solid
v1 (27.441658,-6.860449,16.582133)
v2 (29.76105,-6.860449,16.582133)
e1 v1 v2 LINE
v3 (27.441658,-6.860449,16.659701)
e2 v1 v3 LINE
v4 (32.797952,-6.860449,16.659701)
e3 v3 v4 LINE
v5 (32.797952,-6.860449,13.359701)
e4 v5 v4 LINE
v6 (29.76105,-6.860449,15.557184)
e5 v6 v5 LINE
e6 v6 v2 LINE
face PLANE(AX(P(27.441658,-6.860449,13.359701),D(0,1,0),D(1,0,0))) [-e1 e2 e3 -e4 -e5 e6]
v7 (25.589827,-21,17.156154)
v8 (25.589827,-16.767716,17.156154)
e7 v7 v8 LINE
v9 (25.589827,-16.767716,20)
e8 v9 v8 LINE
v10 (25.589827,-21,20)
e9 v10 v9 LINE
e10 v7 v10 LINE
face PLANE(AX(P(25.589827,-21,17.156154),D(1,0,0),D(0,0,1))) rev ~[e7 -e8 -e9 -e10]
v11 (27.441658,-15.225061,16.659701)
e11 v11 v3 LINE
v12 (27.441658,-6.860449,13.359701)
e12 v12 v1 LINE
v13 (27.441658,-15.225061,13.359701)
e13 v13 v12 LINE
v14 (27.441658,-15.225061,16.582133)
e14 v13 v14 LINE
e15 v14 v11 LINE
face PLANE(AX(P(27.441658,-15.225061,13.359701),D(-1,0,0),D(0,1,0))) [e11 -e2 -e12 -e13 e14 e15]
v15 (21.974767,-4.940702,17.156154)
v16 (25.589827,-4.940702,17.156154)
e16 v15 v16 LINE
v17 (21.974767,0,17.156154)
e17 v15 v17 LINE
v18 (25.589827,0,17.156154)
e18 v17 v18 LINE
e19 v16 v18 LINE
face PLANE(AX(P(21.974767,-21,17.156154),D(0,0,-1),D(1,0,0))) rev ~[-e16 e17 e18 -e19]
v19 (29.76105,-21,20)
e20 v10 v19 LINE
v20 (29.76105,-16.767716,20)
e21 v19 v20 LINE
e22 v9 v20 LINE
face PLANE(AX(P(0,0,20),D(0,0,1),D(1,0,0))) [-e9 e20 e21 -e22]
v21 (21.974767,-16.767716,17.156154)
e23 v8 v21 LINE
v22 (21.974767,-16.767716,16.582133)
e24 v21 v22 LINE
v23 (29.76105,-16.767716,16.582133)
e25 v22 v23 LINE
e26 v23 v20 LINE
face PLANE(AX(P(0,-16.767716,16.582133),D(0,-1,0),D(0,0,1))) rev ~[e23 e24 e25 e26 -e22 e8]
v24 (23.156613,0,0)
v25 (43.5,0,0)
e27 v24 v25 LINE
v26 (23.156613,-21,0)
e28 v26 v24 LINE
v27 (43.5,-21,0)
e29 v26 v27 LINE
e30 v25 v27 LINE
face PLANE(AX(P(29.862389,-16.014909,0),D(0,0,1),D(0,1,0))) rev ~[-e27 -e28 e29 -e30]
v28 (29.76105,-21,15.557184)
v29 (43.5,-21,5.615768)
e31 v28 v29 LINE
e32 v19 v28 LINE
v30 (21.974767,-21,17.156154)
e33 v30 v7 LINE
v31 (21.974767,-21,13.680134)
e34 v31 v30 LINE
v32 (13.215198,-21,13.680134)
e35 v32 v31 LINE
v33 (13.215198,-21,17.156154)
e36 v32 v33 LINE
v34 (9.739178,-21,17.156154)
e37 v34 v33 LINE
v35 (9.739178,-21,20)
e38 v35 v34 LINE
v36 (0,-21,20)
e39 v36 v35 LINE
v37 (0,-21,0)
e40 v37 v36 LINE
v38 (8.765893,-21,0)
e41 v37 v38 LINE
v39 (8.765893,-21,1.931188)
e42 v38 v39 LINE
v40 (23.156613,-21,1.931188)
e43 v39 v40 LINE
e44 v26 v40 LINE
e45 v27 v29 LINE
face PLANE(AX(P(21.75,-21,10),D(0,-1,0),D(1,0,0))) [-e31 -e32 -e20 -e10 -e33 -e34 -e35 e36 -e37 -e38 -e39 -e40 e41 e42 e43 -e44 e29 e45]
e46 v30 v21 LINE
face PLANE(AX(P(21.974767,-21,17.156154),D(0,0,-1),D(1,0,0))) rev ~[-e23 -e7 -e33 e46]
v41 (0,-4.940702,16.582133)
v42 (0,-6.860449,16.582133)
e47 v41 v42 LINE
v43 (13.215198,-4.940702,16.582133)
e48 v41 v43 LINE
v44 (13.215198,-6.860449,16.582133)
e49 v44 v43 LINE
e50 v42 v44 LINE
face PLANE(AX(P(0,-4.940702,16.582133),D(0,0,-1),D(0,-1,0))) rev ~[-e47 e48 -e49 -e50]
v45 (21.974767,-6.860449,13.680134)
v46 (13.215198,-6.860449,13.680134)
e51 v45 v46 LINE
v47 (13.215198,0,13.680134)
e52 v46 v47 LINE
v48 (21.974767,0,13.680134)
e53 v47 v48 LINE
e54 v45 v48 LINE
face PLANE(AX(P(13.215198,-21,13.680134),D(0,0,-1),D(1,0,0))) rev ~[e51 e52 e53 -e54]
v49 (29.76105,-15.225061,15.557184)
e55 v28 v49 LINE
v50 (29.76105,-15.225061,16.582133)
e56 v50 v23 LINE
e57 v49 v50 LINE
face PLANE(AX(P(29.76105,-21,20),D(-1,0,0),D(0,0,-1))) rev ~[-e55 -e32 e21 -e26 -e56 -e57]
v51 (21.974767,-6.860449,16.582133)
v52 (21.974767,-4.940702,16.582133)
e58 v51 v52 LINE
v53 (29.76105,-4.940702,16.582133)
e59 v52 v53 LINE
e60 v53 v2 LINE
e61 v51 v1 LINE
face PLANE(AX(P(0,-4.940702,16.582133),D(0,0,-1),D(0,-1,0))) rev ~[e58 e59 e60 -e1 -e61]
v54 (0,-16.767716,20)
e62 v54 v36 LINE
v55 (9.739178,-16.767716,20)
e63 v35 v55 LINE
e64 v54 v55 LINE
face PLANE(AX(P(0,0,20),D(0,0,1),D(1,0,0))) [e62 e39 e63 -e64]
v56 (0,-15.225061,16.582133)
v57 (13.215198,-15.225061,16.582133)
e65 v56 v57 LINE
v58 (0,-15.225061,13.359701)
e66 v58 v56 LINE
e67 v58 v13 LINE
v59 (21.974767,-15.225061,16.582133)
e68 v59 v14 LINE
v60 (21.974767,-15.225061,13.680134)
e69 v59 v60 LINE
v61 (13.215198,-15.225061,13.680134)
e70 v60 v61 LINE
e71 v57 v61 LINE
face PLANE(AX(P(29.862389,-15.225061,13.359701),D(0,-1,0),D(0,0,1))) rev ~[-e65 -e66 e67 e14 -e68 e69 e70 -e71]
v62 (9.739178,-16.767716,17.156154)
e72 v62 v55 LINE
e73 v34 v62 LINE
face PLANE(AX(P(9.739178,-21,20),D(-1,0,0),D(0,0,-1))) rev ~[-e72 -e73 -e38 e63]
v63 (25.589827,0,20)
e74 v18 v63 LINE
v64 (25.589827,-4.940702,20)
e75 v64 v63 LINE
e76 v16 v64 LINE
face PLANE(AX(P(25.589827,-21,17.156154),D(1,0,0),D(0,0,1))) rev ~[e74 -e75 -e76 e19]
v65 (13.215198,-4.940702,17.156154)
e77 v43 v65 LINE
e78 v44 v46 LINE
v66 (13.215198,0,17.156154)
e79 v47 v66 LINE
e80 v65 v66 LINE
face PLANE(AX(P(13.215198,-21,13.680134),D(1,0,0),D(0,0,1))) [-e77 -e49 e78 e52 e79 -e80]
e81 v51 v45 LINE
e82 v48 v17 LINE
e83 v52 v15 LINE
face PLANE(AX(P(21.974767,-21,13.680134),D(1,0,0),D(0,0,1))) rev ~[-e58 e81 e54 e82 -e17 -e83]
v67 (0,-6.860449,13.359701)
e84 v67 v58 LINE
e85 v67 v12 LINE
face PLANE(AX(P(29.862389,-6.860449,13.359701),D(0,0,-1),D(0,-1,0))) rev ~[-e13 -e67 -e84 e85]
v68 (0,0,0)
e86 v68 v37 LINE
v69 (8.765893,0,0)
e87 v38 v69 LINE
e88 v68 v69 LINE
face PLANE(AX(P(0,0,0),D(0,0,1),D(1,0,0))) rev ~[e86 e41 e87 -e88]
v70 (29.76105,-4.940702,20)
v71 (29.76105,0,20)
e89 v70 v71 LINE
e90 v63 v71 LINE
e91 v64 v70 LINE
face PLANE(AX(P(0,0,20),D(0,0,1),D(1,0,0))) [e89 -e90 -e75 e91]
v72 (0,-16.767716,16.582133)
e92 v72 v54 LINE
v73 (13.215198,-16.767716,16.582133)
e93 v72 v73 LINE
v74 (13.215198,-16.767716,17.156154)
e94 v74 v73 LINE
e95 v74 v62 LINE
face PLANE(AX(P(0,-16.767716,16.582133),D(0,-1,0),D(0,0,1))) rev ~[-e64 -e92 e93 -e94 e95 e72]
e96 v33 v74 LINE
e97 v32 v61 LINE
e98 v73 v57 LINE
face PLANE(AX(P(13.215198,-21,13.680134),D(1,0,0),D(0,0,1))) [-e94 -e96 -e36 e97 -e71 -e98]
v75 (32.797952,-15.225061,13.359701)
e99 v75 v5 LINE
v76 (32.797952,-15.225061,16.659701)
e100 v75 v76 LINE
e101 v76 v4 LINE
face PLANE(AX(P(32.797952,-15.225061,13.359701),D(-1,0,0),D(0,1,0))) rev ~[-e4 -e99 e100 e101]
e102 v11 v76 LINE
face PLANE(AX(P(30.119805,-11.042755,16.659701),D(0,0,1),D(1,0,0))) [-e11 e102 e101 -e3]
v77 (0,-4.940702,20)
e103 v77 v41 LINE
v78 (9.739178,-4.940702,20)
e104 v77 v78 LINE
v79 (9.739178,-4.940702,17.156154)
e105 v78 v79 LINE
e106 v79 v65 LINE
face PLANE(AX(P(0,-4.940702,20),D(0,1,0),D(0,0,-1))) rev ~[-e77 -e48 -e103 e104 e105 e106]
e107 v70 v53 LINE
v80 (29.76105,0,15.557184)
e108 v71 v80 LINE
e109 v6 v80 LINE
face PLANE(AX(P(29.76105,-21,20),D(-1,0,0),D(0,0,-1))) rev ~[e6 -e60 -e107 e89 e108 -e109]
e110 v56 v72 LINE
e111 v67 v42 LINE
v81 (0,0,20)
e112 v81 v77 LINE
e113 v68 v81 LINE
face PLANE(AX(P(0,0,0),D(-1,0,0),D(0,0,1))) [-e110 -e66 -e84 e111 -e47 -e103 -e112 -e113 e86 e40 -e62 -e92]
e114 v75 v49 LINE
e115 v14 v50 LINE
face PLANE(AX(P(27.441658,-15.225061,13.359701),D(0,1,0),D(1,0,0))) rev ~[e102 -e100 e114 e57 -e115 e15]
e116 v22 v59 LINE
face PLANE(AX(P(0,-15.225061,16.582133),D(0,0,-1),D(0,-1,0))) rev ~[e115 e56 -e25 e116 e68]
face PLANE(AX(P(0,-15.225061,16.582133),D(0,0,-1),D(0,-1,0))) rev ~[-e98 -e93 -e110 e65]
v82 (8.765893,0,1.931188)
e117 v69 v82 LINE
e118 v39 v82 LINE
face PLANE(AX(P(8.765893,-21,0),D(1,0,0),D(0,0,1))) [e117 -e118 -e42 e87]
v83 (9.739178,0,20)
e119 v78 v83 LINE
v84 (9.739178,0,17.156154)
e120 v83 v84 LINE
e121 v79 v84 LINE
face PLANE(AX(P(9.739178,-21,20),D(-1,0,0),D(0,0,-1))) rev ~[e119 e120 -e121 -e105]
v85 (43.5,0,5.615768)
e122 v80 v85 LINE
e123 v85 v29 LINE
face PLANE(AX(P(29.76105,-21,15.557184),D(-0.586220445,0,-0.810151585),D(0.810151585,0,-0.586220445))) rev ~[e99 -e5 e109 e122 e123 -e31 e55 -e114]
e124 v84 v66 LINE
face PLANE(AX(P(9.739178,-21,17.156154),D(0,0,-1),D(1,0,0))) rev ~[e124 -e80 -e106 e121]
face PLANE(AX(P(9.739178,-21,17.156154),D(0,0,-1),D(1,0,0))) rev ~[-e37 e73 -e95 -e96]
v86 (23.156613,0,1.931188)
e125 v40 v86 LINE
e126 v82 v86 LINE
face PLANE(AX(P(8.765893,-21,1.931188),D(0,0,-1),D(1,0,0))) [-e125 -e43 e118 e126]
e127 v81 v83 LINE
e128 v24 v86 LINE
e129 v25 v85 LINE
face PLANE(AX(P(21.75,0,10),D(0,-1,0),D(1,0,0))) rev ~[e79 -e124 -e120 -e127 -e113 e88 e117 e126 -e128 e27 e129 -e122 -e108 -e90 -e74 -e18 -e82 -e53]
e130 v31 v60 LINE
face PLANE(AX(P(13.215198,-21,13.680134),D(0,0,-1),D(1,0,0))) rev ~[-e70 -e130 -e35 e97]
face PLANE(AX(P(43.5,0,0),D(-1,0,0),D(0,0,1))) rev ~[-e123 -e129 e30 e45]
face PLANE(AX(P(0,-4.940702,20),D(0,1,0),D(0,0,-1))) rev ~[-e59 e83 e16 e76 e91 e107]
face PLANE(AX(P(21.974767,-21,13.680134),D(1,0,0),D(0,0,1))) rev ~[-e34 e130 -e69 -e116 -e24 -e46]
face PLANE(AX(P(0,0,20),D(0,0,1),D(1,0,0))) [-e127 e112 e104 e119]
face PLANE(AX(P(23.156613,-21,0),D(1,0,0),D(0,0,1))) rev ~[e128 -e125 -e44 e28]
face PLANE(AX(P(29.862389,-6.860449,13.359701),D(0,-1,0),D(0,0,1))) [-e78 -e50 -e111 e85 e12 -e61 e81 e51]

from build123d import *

# Parameters (mm, degrees)
F0_W      = 43.5
F0_H      = 20
F1_DEPTH  = 21
F2_W      = 23.5
F2_H      = 2
F3_DEPTH  = 79
F4_W      = 8.7595684454
F4_H      = 3.4760199487
F4_W_2    = 14.3907200545
F4_H_2    = 1.9311879296
F5_DEPTH  = 21.001
F6_W      = 18.0619247258
F6_H      = 11.0779828392
F7_DEPTH  = 20.001
F8_W      = 8.364611771
F8_H      = 3.2224319875
F9_DEPTH  = 43.501
F10_DEPTH = 13.8
F11_DEPTH = 16.0159093717
F12_W     = 5.3562937983
F12_H     = 8.364611771
F13_DEPTH = 3.3


# Not quite as in the source:
# - an extrude ends at something that could not be found from the text; its depth is read off the source's solid


with BuildPart() as f1:
    # F0 (on Front) → F1 (new body)
    with BuildSketch(Plane.XZ):
        with Locations((21.75, 10)):
            Rectangle(F0_W, F0_H)
    extrude(amount=F1_DEPTH)

    # F2 (on Front) → F3 (cut, through all)
    with BuildSketch(Plane.XZ):
        with Locations((15.8696506918, 1)):
            Rectangle(F2_W, F2_H)
    extrude(amount=-F3_DEPTH, mode=Mode.SUBTRACT)

    # F4 (on face) → F5 (cut, through all)
    with BuildSketch(Plane.XZ.offset(21)):
        Polygon((25.5898274481, 20), (9.7391782328, 20), (9.7391782328, 17.1561539173), (13.2151981816, 17.1561539173), (21.974766627, 17.1561539173), (25.5898274481, 17.1561539173), align=None)
        with Locations((17.5949824043, 15.418143943)):
            Rectangle(F4_W, F4_H)
        with Locations((15.9612530842, 0.9655939648)):
            Rectangle(F4_W_2, F4_H_2)
        Polygon((43.5, 20), (29.7610498965, 20), (29.7610498965, 15.5571838841), (43.5, 5.6157684885), align=None)
    extrude(amount=-F5_DEPTH, mode=Mode.SUBTRACT)

    # F6 (on Top) → F7 (cut, through all)
    with BuildSketch(Plane.XY):
        with Locations((38.8933513314, -10.4759179521)):
            Rectangle(F6_W, F6_H)
    extrude(amount=F7_DEPTH, mode=Mode.SUBTRACT)

    # F8 (on face) → F9 (cut, through all)
    with BuildSketch(Plane(origin=(0, 0, 0), x_dir=(0, -1, 0), z_dir=(-1, 0, 0))):
        with Locations((11.04275533, 14.9709172547)):
            Rectangle(F8_W, F8_H)
        Polygon((16.7677160352, 20), (4.9407021143, 20), (4.9407021143, 16.5821332484), (6.8604494445, 16.5821332484), (15.2250612155, 16.5821332484), (16.7677160352, 16.5821332484), align=None)
    extrude(amount=-F9_DEPTH, mode=Mode.SUBTRACT)

    # F10 (add): a face of the model
    f10_faces = [f1.faces().sort_by_distance(p)[0] for p in [
        (29.8623889685, -10.4104180179, 6.9700489552),
    ]]
    extrude(f10_faces, amount=F10_DEPTH)

    # F11 (cut, through all): a face of the model
    f11_faces = [f1.faces().sort_by_distance(p)[0] for p in [
        (39.1208034391, -16.0149093717, 12.034105167),
    ]]
    extrude(f11_faces, amount=-F11_DEPTH, mode=Mode.SUBTRACT)

    # F12 (on face) → F13 (join)
    with BuildSketch(Plane.XY.offset(13.3597012609)):
        with Locations((30.1198049788, -11.04275533)):
            Rectangle(F12_W, F12_H)
    extrude(amount=F13_DEPTH)


solid = f1.part
